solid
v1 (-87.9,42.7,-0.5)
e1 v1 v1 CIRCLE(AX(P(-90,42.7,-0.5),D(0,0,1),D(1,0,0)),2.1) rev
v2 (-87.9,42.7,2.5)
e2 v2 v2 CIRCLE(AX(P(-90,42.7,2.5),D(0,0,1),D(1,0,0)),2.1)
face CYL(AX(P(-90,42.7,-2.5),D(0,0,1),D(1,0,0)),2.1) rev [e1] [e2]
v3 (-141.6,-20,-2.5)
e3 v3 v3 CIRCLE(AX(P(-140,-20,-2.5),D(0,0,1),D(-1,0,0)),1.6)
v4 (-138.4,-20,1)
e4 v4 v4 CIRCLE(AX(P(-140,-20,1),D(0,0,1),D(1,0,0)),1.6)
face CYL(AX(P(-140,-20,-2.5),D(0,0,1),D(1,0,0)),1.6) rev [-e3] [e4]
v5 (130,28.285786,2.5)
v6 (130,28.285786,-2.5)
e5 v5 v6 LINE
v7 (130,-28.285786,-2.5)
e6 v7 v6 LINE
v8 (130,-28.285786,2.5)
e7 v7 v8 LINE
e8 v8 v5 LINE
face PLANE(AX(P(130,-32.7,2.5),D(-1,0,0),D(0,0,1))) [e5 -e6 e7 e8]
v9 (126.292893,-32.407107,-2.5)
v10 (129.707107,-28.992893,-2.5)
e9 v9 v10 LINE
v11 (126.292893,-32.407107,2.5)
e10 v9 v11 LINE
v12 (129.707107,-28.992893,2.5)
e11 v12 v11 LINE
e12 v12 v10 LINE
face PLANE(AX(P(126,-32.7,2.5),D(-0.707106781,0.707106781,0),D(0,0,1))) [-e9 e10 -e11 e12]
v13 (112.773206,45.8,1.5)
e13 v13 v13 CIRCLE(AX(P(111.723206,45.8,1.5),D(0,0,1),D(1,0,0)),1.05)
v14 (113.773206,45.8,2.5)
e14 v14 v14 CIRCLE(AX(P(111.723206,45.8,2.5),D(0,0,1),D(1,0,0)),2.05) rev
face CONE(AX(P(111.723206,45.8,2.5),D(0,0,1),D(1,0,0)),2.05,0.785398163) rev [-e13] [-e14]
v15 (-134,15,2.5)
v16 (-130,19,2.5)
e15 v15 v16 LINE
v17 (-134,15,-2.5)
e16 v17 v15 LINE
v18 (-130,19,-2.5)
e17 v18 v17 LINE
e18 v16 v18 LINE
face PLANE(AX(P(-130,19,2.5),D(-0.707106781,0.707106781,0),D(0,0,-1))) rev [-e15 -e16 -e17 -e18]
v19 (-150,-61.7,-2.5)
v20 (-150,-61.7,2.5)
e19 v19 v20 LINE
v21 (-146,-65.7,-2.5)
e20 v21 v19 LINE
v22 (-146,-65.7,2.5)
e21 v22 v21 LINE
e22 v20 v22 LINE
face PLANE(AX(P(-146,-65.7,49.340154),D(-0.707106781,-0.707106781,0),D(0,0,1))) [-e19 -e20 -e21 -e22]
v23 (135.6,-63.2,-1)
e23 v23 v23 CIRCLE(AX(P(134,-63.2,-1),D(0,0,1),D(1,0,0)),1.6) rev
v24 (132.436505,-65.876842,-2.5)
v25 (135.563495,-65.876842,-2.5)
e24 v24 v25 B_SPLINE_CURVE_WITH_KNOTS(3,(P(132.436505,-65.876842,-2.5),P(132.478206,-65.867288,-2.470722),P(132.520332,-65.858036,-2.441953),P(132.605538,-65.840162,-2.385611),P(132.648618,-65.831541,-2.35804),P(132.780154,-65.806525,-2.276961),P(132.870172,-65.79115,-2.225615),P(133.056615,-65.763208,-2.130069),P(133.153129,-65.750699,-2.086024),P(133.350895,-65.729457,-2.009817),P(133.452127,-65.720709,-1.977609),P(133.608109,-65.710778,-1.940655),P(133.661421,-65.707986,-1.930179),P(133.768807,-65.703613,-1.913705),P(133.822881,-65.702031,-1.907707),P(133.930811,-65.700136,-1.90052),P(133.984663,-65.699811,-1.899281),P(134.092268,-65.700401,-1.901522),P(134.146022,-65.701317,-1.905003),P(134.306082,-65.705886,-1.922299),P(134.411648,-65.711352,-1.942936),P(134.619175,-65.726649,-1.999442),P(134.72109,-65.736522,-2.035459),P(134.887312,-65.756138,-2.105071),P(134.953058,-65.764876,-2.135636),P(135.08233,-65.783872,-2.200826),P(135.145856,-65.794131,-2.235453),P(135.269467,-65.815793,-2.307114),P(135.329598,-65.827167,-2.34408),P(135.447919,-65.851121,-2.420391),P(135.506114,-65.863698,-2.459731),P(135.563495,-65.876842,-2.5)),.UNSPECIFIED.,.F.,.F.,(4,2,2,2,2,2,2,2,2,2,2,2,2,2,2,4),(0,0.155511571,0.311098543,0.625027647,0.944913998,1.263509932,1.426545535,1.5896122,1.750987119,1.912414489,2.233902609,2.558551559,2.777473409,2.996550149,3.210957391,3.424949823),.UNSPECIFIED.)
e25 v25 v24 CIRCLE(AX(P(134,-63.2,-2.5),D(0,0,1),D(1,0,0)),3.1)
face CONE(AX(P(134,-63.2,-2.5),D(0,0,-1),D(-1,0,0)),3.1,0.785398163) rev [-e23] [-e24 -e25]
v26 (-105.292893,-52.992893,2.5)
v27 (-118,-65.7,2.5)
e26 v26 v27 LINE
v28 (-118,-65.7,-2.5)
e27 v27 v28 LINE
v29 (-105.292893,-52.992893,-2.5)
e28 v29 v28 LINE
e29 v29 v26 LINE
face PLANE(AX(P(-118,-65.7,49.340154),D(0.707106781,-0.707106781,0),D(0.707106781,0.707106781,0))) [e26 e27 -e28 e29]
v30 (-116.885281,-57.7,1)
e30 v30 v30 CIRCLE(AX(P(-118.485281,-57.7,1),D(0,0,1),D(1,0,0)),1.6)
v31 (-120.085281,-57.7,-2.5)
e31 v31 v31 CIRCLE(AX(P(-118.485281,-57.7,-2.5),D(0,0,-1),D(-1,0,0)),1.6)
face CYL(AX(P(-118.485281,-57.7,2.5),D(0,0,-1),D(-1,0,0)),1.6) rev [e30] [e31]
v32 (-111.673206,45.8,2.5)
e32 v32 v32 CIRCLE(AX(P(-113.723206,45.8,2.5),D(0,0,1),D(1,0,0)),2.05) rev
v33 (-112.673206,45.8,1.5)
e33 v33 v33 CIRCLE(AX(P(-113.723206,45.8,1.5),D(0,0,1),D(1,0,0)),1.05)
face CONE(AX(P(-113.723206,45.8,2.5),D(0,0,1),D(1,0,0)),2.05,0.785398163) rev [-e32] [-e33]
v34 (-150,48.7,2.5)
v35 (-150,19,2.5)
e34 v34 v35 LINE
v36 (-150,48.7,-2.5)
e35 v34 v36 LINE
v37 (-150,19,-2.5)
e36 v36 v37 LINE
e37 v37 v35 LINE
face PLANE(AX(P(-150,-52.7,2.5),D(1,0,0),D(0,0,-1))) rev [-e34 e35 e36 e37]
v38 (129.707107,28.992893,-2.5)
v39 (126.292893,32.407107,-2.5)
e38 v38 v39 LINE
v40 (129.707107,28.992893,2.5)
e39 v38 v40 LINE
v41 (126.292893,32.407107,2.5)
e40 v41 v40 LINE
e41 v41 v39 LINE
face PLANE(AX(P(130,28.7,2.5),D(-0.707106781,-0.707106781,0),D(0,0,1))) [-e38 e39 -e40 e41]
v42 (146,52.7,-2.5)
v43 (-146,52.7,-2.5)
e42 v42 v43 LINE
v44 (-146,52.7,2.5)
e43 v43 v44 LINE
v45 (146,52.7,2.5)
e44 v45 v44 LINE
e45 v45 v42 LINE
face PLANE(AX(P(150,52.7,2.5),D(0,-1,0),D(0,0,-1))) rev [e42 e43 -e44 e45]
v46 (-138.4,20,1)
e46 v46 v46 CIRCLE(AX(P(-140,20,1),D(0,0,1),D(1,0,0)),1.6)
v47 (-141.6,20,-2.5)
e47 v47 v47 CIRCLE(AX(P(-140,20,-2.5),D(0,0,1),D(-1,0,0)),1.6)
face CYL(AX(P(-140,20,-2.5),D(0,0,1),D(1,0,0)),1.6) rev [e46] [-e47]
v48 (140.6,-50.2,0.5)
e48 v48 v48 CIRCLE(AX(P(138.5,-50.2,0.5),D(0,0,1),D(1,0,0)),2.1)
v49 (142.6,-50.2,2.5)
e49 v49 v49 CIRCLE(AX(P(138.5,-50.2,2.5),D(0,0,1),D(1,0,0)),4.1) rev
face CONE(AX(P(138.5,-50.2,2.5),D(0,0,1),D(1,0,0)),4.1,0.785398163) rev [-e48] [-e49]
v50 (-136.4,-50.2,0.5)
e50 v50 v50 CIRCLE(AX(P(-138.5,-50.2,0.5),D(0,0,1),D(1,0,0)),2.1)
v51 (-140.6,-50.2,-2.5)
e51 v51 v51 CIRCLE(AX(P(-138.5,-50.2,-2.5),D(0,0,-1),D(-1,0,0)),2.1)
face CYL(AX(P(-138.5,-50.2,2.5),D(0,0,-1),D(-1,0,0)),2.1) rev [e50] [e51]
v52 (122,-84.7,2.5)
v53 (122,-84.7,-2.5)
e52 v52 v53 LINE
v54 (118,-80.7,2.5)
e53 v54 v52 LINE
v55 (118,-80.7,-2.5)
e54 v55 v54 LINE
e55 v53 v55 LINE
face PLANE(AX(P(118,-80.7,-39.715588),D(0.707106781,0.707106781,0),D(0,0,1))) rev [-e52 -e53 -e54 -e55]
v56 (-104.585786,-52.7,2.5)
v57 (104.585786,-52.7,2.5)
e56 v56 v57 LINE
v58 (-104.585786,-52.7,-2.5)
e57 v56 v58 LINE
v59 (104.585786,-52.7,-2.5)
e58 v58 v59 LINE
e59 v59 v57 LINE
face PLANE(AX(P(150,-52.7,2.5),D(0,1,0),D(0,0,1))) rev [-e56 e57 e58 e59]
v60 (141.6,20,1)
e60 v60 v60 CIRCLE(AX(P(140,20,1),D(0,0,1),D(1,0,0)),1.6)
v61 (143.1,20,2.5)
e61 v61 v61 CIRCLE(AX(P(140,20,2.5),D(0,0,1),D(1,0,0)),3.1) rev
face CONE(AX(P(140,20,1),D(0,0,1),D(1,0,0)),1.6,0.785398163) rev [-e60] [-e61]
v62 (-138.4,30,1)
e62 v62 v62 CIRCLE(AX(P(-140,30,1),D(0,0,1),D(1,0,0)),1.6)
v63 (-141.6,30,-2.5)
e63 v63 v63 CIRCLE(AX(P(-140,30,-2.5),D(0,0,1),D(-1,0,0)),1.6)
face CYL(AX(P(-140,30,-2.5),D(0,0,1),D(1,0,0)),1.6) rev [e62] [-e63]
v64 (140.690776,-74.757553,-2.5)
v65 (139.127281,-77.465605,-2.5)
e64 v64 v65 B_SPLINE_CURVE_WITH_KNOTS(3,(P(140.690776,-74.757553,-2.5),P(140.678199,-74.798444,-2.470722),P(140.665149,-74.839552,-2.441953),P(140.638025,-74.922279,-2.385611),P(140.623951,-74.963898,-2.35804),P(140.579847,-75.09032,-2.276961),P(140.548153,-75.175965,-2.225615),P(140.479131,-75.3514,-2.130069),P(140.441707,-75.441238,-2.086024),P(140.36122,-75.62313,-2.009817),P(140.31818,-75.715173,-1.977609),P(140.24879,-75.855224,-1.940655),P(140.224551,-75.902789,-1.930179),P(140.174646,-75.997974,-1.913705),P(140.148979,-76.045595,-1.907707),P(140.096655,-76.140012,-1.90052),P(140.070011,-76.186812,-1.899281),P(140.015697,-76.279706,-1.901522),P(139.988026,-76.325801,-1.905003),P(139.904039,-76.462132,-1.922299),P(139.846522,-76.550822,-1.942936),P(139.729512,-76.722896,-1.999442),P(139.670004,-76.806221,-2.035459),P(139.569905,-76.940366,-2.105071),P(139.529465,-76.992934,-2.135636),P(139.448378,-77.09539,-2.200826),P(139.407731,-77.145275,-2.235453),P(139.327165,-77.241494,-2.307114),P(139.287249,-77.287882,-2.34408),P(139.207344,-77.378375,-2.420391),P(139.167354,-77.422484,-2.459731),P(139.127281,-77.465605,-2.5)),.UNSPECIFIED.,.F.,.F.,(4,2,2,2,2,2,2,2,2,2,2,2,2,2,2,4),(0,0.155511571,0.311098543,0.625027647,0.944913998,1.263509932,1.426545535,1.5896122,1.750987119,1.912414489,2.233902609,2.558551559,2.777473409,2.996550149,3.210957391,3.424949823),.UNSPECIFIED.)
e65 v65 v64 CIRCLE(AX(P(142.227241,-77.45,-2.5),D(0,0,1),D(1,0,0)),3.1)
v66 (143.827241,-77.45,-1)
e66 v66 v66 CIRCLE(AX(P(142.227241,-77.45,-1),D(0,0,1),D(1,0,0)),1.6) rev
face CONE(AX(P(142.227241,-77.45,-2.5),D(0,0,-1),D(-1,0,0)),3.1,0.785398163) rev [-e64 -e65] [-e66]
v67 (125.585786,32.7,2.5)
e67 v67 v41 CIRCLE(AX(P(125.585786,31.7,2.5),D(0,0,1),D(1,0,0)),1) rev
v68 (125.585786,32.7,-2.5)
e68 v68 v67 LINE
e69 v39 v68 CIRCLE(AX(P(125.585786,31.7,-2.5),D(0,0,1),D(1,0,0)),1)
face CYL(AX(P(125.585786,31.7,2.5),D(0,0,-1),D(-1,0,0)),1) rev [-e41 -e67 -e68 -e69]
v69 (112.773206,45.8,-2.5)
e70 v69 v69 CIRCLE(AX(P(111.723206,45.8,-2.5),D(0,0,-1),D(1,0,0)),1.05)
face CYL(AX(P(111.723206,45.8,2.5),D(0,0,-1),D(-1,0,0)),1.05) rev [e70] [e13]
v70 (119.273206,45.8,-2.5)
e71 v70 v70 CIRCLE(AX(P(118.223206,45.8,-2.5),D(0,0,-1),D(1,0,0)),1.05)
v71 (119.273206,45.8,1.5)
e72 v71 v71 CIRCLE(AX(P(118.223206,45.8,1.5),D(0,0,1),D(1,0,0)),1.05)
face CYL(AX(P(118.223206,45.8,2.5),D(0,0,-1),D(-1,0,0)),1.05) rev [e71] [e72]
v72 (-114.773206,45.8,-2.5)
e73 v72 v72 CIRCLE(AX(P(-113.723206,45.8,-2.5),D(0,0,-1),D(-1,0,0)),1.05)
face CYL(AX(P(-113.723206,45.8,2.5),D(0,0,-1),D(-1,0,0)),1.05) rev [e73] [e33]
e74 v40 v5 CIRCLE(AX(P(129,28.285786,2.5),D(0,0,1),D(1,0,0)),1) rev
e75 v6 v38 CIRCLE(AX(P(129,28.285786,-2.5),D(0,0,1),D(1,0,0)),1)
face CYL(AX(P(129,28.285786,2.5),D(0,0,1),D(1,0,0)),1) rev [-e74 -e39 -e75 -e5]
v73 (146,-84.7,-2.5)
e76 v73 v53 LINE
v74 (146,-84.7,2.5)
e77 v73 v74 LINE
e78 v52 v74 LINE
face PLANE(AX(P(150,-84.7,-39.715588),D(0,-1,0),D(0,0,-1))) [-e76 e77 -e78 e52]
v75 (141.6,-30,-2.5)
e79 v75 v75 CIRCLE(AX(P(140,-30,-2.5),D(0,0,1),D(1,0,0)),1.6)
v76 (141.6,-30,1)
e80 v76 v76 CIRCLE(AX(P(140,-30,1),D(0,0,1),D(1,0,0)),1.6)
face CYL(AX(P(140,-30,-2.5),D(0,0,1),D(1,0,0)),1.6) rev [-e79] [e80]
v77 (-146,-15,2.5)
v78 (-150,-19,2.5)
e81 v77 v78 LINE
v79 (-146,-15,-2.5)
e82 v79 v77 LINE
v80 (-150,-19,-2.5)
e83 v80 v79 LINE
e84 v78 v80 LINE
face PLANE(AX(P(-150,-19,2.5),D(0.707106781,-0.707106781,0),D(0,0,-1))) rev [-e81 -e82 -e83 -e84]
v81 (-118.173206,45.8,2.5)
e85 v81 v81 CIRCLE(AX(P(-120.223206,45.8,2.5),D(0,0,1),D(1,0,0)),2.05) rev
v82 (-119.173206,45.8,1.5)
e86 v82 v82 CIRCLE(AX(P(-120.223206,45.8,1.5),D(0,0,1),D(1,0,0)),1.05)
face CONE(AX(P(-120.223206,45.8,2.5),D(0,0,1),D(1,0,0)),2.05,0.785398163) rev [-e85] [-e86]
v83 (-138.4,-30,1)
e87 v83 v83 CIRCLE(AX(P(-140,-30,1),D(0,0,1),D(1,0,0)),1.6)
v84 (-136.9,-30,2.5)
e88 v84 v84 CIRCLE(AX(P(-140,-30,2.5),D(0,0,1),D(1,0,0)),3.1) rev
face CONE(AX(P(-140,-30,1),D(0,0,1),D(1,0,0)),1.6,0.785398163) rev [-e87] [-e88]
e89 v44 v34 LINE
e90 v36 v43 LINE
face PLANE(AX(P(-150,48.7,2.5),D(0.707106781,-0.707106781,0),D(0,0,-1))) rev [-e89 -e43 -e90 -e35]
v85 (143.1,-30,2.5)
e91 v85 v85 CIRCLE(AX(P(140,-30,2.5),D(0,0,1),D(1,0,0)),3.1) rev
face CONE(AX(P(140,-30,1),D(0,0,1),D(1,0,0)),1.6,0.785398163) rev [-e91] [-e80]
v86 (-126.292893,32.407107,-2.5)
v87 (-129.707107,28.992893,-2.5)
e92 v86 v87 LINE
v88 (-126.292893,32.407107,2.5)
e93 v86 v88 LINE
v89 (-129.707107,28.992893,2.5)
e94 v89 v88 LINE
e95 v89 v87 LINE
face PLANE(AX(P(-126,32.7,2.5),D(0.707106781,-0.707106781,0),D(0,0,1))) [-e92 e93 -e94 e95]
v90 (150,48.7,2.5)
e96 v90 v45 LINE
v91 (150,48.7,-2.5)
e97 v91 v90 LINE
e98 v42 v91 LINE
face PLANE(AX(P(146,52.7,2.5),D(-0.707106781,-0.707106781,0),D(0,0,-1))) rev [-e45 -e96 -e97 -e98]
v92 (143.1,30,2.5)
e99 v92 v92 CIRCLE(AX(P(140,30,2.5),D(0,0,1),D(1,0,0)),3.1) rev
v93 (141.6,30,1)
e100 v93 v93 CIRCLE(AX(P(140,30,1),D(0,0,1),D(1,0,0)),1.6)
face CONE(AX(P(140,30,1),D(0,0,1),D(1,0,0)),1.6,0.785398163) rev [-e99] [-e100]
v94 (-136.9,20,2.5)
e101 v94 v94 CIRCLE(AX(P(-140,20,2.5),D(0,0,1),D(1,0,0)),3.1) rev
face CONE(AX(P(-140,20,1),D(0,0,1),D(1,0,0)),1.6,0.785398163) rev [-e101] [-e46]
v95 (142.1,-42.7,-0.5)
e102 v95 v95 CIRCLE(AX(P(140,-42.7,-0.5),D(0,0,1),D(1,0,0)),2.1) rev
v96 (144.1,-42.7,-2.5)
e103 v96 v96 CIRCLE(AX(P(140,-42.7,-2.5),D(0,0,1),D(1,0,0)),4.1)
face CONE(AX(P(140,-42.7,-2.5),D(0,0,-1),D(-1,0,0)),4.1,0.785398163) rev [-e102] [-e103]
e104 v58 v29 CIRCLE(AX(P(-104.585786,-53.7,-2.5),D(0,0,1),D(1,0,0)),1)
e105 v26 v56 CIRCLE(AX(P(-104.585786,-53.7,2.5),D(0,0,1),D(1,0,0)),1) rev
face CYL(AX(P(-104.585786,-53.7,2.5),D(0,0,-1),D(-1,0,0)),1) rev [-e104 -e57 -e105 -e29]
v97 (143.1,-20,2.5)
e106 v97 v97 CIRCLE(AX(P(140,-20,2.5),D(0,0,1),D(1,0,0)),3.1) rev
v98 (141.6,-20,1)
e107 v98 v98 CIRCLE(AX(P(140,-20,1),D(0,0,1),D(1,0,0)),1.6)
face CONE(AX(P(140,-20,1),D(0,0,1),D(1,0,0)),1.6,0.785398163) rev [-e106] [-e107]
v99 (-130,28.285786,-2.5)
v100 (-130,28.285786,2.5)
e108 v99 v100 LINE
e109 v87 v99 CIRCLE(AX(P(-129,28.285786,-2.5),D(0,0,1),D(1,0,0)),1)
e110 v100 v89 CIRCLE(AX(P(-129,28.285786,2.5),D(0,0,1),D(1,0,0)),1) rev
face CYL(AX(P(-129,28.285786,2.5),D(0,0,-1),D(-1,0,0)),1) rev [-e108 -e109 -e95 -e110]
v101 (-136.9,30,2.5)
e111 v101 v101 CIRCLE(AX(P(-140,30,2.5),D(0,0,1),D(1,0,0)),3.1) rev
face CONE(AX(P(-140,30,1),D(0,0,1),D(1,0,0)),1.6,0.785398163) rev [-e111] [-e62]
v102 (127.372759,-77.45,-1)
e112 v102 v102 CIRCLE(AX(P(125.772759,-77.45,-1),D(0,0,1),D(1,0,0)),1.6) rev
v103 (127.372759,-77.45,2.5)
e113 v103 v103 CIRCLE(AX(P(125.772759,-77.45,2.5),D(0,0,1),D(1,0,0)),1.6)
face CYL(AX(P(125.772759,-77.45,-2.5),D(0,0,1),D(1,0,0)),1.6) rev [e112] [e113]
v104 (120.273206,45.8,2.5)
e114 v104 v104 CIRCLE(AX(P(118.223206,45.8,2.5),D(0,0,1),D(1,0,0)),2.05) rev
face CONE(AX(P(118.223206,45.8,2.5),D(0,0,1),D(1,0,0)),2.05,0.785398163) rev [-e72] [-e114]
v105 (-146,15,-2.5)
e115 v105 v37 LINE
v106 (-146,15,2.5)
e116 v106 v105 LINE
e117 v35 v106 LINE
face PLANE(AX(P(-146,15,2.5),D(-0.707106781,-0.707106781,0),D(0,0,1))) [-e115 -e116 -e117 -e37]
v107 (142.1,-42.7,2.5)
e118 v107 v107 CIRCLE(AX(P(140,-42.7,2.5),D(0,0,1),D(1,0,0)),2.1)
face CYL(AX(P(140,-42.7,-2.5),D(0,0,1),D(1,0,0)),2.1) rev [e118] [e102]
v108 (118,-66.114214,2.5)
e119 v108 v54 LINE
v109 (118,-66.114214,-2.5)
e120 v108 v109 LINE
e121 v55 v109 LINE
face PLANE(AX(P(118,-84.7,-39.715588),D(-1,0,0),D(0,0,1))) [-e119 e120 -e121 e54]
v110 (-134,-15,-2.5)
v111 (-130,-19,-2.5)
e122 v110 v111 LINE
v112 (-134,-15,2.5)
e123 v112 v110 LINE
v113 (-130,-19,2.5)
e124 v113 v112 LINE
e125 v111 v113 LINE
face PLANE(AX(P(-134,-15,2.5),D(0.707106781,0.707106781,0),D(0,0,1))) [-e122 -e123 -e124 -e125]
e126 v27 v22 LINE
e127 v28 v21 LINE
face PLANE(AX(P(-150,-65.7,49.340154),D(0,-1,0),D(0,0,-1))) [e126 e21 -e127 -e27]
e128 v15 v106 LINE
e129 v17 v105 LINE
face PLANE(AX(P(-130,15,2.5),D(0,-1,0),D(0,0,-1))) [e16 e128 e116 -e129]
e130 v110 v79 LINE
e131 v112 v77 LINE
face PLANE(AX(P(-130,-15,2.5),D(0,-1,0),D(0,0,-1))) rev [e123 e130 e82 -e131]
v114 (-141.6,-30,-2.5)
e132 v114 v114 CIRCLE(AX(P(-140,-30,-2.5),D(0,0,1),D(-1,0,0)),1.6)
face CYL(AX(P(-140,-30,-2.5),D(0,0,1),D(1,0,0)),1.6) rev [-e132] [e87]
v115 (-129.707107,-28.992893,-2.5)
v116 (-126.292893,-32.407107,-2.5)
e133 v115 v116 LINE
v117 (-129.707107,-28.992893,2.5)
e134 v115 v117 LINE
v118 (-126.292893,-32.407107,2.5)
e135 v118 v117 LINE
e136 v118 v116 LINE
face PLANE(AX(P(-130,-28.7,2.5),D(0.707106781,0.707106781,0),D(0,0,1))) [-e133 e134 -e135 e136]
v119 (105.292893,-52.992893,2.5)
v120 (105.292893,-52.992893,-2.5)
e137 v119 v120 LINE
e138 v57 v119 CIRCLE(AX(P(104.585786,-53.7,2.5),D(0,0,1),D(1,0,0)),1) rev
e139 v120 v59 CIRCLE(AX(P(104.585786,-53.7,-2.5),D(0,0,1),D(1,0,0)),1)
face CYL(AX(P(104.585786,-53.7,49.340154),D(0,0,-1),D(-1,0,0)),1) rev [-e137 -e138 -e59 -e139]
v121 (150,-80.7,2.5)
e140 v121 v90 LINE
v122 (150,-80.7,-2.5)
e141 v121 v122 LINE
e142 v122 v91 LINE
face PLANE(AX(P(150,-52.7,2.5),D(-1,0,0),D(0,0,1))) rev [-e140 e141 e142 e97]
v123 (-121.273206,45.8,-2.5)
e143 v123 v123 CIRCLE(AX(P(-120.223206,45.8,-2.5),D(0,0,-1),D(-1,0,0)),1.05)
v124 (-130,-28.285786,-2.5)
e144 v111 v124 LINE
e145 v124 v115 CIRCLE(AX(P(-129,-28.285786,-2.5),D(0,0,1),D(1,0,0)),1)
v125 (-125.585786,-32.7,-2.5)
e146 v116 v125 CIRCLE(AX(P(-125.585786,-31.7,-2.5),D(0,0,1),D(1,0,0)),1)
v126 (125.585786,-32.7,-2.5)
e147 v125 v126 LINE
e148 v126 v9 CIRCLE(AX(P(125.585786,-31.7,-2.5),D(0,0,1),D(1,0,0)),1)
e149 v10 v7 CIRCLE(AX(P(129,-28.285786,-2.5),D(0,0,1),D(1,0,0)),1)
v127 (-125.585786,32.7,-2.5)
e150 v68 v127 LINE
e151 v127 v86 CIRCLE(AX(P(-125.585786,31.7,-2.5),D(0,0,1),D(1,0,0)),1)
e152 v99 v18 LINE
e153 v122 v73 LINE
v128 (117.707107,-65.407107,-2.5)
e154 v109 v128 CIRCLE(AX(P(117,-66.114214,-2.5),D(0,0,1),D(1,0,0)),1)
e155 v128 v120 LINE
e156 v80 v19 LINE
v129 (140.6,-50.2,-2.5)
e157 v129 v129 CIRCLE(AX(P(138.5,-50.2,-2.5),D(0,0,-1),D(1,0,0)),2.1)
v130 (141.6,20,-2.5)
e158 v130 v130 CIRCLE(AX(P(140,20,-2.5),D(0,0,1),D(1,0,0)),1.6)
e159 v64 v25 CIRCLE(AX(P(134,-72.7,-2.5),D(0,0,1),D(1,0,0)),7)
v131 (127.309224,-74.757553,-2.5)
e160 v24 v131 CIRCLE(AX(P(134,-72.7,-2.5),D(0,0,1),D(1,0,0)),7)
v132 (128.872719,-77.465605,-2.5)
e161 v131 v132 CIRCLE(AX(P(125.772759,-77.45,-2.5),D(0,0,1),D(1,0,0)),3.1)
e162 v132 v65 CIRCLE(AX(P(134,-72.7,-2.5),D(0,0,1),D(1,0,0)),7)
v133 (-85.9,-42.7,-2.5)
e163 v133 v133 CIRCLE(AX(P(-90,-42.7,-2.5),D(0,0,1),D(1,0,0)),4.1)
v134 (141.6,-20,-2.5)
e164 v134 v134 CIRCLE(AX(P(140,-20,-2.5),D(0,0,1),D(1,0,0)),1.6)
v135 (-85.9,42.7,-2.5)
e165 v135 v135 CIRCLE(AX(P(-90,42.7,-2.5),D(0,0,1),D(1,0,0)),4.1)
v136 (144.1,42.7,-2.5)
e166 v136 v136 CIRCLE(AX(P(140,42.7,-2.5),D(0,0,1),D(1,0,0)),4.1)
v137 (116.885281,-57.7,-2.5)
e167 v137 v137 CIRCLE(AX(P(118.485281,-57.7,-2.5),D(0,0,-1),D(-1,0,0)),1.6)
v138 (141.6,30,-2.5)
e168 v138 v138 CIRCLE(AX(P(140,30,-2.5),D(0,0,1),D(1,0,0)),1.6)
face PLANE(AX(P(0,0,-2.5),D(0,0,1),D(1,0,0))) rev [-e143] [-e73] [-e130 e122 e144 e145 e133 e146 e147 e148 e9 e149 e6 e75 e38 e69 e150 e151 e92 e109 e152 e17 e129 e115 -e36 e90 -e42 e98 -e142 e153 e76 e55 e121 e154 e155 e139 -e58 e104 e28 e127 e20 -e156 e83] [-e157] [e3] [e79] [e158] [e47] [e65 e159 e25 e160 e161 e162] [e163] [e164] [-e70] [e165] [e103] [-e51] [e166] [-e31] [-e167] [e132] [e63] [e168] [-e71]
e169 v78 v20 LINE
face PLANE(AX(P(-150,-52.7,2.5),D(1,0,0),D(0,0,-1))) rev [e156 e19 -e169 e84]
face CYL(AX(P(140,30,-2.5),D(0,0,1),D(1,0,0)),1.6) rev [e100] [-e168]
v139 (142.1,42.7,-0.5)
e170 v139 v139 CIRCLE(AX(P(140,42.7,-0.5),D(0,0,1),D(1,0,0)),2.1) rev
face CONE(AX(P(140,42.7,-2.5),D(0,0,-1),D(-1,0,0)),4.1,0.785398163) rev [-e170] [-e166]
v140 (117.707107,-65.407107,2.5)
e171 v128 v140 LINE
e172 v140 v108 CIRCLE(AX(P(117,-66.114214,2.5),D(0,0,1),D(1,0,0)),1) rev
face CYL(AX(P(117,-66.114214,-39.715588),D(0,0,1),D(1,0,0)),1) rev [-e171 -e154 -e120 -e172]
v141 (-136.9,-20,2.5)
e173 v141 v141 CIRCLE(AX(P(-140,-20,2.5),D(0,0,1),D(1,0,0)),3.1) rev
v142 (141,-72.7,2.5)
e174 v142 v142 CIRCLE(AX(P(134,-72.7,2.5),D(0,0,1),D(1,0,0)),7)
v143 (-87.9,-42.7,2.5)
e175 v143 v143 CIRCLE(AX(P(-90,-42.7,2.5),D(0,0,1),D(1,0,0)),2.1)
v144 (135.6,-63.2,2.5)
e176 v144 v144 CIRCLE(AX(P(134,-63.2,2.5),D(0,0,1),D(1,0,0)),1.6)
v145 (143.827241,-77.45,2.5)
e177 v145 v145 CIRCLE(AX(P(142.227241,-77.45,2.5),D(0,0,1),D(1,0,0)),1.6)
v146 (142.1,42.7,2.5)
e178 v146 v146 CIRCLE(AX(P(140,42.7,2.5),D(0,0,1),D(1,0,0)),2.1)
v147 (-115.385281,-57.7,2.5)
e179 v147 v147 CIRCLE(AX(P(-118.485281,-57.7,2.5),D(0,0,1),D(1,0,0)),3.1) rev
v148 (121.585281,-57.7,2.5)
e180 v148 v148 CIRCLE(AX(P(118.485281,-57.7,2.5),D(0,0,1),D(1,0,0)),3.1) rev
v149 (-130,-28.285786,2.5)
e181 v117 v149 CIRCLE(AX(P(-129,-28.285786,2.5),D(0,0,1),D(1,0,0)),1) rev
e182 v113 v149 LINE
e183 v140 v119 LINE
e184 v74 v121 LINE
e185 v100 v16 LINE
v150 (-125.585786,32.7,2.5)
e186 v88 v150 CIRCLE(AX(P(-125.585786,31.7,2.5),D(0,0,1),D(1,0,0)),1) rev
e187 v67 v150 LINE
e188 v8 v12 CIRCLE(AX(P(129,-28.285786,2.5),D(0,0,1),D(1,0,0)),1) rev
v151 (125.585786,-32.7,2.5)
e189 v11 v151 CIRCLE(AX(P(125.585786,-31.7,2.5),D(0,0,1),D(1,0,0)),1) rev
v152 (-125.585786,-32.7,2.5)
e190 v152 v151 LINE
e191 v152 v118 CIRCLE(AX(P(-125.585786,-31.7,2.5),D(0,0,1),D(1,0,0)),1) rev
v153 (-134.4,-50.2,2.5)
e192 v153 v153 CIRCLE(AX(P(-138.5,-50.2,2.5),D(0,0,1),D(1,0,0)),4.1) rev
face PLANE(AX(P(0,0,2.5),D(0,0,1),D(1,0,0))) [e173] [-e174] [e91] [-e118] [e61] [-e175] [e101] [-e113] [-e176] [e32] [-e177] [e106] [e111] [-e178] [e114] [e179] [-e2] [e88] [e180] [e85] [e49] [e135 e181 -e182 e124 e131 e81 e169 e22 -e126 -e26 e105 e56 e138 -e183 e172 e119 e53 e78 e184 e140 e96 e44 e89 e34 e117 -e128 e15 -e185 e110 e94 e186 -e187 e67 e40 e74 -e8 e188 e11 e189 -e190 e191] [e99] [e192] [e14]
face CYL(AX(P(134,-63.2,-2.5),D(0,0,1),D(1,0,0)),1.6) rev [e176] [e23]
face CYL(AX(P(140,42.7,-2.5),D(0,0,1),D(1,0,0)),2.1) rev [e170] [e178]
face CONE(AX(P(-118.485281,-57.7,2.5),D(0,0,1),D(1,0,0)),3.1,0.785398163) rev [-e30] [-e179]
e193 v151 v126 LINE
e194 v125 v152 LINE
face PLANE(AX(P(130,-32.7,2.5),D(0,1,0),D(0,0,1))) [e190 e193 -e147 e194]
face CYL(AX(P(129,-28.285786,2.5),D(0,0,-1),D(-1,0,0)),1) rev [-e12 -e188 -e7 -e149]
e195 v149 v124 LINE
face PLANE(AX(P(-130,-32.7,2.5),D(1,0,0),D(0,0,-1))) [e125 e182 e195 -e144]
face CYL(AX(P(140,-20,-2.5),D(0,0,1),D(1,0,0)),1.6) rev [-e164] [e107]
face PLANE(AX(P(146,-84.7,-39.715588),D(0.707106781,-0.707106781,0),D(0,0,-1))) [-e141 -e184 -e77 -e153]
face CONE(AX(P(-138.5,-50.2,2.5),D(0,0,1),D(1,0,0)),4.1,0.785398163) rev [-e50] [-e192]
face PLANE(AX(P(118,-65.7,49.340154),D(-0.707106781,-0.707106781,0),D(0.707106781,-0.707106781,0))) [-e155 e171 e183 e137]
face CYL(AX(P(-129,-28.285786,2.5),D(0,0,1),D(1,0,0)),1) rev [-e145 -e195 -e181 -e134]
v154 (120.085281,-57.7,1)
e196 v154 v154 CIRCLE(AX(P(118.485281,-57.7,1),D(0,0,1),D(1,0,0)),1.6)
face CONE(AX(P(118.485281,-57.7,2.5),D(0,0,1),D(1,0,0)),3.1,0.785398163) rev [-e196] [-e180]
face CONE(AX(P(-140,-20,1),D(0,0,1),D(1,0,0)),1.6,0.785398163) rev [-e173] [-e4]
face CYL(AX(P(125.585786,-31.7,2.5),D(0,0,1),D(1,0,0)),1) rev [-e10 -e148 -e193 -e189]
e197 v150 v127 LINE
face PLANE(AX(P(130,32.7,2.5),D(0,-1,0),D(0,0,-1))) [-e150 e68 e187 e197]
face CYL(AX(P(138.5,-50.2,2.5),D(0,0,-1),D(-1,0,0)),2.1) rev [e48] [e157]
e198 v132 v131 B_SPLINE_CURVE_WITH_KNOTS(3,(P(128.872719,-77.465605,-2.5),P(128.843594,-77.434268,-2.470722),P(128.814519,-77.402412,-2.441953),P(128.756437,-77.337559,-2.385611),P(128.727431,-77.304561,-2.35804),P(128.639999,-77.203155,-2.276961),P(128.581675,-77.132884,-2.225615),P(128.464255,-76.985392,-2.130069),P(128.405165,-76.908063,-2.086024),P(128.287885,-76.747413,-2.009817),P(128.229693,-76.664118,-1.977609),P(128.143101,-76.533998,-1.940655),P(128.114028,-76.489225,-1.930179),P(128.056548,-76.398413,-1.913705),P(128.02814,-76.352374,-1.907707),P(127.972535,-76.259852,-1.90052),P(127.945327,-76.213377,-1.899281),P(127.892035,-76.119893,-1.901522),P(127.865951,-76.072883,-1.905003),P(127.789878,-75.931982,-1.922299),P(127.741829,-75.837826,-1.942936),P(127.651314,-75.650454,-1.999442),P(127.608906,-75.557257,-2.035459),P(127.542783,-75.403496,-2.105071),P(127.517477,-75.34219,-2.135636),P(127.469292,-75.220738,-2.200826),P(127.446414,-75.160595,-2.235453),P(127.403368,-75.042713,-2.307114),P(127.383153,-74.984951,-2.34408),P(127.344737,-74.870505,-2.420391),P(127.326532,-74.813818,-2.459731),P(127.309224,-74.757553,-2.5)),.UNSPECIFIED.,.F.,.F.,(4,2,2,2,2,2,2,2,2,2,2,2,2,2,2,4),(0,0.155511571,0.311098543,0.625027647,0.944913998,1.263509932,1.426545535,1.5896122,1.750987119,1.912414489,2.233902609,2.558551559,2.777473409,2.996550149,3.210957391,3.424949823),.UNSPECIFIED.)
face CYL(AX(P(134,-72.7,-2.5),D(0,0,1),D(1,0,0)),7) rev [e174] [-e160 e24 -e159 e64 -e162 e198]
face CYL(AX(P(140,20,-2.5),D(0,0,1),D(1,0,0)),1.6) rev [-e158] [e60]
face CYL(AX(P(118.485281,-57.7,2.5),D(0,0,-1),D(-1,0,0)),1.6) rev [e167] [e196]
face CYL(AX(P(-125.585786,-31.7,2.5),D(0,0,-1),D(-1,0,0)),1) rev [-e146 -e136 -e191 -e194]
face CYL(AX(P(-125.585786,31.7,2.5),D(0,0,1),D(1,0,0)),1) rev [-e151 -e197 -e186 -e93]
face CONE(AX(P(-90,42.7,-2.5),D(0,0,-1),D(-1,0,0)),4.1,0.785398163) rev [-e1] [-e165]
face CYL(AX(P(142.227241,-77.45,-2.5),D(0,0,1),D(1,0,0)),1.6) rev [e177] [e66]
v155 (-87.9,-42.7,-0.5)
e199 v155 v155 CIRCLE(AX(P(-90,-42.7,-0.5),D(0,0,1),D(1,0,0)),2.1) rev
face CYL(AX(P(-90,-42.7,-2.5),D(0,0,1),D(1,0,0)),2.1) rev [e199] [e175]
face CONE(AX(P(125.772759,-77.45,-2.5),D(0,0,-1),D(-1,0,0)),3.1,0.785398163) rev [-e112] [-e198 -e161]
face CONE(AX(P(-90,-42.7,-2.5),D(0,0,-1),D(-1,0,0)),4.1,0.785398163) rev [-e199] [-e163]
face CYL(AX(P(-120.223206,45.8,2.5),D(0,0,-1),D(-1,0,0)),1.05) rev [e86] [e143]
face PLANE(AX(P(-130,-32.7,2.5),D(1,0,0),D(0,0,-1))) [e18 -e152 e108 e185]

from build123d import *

# Parameters (mm, degrees)
SKETCH_1_W          = 300
SKETCH_1_H          = 105.4
SKETCH_1_W_2        = 260
SKETCH_1_H_2        = 65.4
EXTRUDE_1_DEPTH     = 2.5
SKETCH_2_R          = 2.1
CUT_EXTRUDE_1_DEPTH = 160.066935596
SKETCH_3_R          = 1.6
CUT_EXTRUDE_2_DEPTH = 160.066935596
CHAMFER_1_SIZE      = 1.5
CHAMFER_2_SIZE      = 2
SKETCH_5_W          = 20
SKETCH_5_H          = 30
CUT_EXTRUDE_5_DEPTH = 160.066935596
EXTRUDE_2_DEPTH     = 5
SKETCH_7_R          = 1.6
SKETCH_7_R_2        = 2.1
CUT_EXTRUDE_6_DEPTH = 164.833726687
CHAMFER_4_SIZE      = 2
CHAMFER_5_SIZE      = 1.5
SKETCH_8_W          = 32
SKETCH_8_H          = 19
EXTRUDE_3_DEPTH     = 5
CHAMFER_3_SIZE      = 4
FILLET_1_R          = 1
SKETCH_9_R          = 7
SKETCH_9_R_2        = 1.6
CUT_EXTRUDE_7_DEPTH = 173.334239198
CHAMFER_6_SIZE      = 1.5
SKETCH_10_R         = 1.05
CUT_EXTRUDE_8_DEPTH = 173.334239201
CHAMFER_7_SIZE      = 1


with BuildPart() as part:
    # 草图1 → 凸台-拉伸1 (new, symmetric)
    with BuildSketch(Plane.XY):
        Rectangle(SKETCH_1_W, SKETCH_1_H)
        Rectangle(SKETCH_1_W_2, SKETCH_1_H_2, mode=Mode.SUBTRACT)
    extrude(amount=EXTRUDE_1_DEPTH, both=True)

    # 草图2 → 切除-拉伸1 (cut, through all)
    with BuildSketch(Plane.XY.offset(2.5)):
        with Locations((-90, 42.7)):
            Circle(SKETCH_2_R)
        with Locations((140, 42.7)):
            Circle(SKETCH_2_R)
        with Locations((-90, -42.7)):
            Circle(SKETCH_2_R)
        with Locations((140, -42.7)):
            Circle(SKETCH_2_R)
    extrude(amount=-CUT_EXTRUDE_1_DEPTH, mode=Mode.SUBTRACT)

    # 草图3 → 切除-拉伸2 (cut, through all)
    with BuildSketch(Plane.XY.offset(2.5)):
        with Locations((140, 30)):
            Circle(SKETCH_3_R)
        with Locations((140, -30)):
            Circle(SKETCH_3_R)
        with Locations((140, 20)):
            Circle(SKETCH_3_R)
        with Locations((140, -20)):
            Circle(SKETCH_3_R)
        with Locations(Location((-140, -30, 0), (0, 0, 180))):
            Circle(SKETCH_3_R)
        with Locations(Location((-140, -20, 0), (0, 0, 180))):
            Circle(SKETCH_3_R)
        with Locations(Location((-140, 20, 0), (0, 0, 180))):
            Circle(SKETCH_3_R)
        with Locations(Location((-140, 30, 0), (0, 0, 180))):
            Circle(SKETCH_3_R)
    extrude(amount=-CUT_EXTRUDE_2_DEPTH, mode=Mode.SUBTRACT)

    # 倒角1
    chamfer_1_edges = [part.edges().sort_by_distance(p)[0] for p in [
        (-138.4, -30, 2.5),
        (138.4, -20, 2.5),
        (138.4, 20, 2.5),
        (138.4, -30, 2.5),
        (-138.4, -20, 2.5),
        (-138.4, 20, 2.5),
        (-138.4, 30, 2.5),
        (138.4, 30, 2.5),
    ]]
    chamfer(chamfer_1_edges, length=CHAMFER_1_SIZE)

    # 倒角2
    chamfer_2_edges = [part.edges().sort_by_distance(p)[0] for p in [
        (137.9, 42.7, -2.5),
        (-92.1, -42.7, -2.5),
        (137.9, -42.7, -2.5),
        (-92.1, 42.7, -2.5),
    ]]
    chamfer(chamfer_2_edges, length=CHAMFER_2_SIZE)

    # 草图5 → 切除-拉伸5 (cut, through all)
    with BuildSketch(Plane(origin=(0, 0, -2.5), x_dir=(-1, 0, 0), z_dir=(0, 0, -1))):
        with Locations((140, 0)):
            Rectangle(SKETCH_5_W, SKETCH_5_H)
    extrude(amount=-CUT_EXTRUDE_5_DEPTH, mode=Mode.SUBTRACT)

    # 草图6 → 凸台-拉伸2 (add)
    with BuildSketch(Plane(origin=(0, 0, -2.5), x_dir=(-1, 0, 0), z_dir=(0, 0, -1))):
        Polygon((150, -52.7), (150, -65.7), (118, -65.7), (105, -52.7), align=None)
        Polygon((-118, -65.7), (-105, -52.7), (-150, -52.7), (-150, -65.7), align=None)
    extrude(amount=-EXTRUDE_2_DEPTH)

    # 草图7 → 切除-拉伸6 (cut, through all)
    with BuildSketch(Plane(origin=(0, 0, -2.5), x_dir=(-1, 0, 0), z_dir=(0, 0, -1))):
        with Locations((118.485281374, -57.7)):
            Circle(SKETCH_7_R)
        with Locations((-118.485281374, -57.7)):
            Circle(SKETCH_7_R)
        with Locations((138.5, -50.2)):
            Circle(SKETCH_7_R_2)
        with Locations(Location((-138.5, -50.2, 0), (0, 0, 180))):
            Circle(SKETCH_7_R_2)
    extrude(amount=-CUT_EXTRUDE_6_DEPTH, mode=Mode.SUBTRACT)

    # 倒角4
    chamfer_4_edges = [part.edges().sort_by_distance(p)[0] for p in [
        (136.4, -50.2, 2.5),
        (-136.4, -50.2, 2.5),
    ]]
    chamfer(chamfer_4_edges, length=CHAMFER_4_SIZE)

    # 倒角5
    chamfer_5_edges = [part.edges().sort_by_distance(p)[0] for p in [
        (120.085281374, -57.7, 2.5),
        (-116.885281374, -57.7, 2.5),
    ]]
    chamfer(chamfer_5_edges, length=CHAMFER_5_SIZE)

    # 草图8 → 凸台-拉伸3 (add)
    with BuildSketch(Plane.XY.offset(2.5)):
        with Locations((134, -75.2)):
            Rectangle(SKETCH_8_W, SKETCH_8_H)
    extrude(amount=-EXTRUDE_3_DEPTH)

    # 倒角3
    chamfer_3_edges = [part.edges().sort_by_distance(p)[0] for p in [
        (-130, -15, 0),
        (-130, 15, 0),
        (-150, 15, 0),
        (-150, -15, 0),
        (-150, -65.7, 0),
        (-130, 32.7, 0),
        (-130, -32.7, 0),
        (130, -32.7, 0),
        (130, 32.7, 0),
        (150, -84.7, 0),
        (118, -84.7, 0),
        (-150, 52.7, 0),
        (150, 52.7, 0),
    ]]
    chamfer(chamfer_3_edges, length=CHAMFER_3_SIZE)

    # 圆角1
    fillet_1_edges = [part.edges().sort_by_distance(p)[0] for p in [
        (-105, -52.7, 0),
        (105, -52.7, 0),
        (118, -65.7, 0),
        (-130, 28.7, 0),
        (-130, -28.7, 0),
        (126, -32.7, 0),
        (-126, -32.7, 0),
        (126, 32.7, 0),
        (-126, 32.7, 0),
        (130, -28.7, 0),
        (130, 28.7, 0),
    ]]
    fillet(fillet_1_edges, radius=FILLET_1_R)

    # 草图9 → 切除-拉伸7 (cut, through all)
    with BuildSketch(Plane.XY.offset(2.5)):
        with Locations((134, -72.7)):
            Circle(SKETCH_9_R)
        with Locations((134, -63.2)):
            Circle(SKETCH_9_R_2)
        with Locations((142.227241336, -77.45)):
            Circle(SKETCH_9_R_2)
        with Locations((125.772758664, -77.45)):
            Circle(SKETCH_9_R_2)
    extrude(amount=-CUT_EXTRUDE_7_DEPTH, mode=Mode.SUBTRACT)

    # 倒角6
    # the kernel refuses this chamfer: 1.5 mm, written as the material it takes off along each edge
    with BuildSketch(Plane(origin=(125.772758664, -77.45, -2.5), x_dir=(1, 0, 0), z_dir=(0, -1, 0))) as chamfer_6_piece_1:
        Polygon((1.6, CHAMFER_6_SIZE), (1.6 + CHAMFER_6_SIZE, 0), (1.6, 0), align=None)
    revolve(axis=Axis((125.772758664, -77.45, -2.5), (0, 0, 1)), mode=Mode.SUBTRACT)
    with BuildSketch(Plane(origin=(142.227241336, -77.45, -2.5), x_dir=(1, 0, 0), z_dir=(0, -1, 0))) as chamfer_6_piece_2:
        Polygon((1.6, CHAMFER_6_SIZE), (1.6 + CHAMFER_6_SIZE, 0), (1.6, 0), align=None)
    revolve(axis=Axis((142.227241336, -77.45, -2.5), (0, 0, 1)), mode=Mode.SUBTRACT)
    with BuildSketch(Plane(origin=(134, -63.2, -2.5), x_dir=(1, 0, 0), z_dir=(0, -1, 0))) as chamfer_6_piece_3:
        Polygon((1.6, CHAMFER_6_SIZE), (1.6 + CHAMFER_6_SIZE, 0), (1.6, 0), align=None)
    revolve(axis=Axis((134, -63.2, -2.5), (0, 0, 1)), mode=Mode.SUBTRACT)

    # 草图10 → 切除-拉伸8 (cut, through all)
    with BuildSketch(Plane(origin=(0, 0, -2.5), x_dir=(-1, 0, 0), z_dir=(0, 0, -1))):
        with Locations((120.223206297, 45.8)):
            Circle(SKETCH_10_R)
        with Locations((113.723206297, 45.8)):
            Circle(SKETCH_10_R)
        with Locations(Location((-111.723206297, 45.8, 0), (0, 0, 180))):
            Circle(SKETCH_10_R)
        with Locations(Location((-118.223206297, 45.8, 0), (0, 0, 180))):
            Circle(SKETCH_10_R)
    extrude(amount=-CUT_EXTRUDE_8_DEPTH, mode=Mode.SUBTRACT)

    # 倒角7
    chamfer_7_edges = [part.edges().sort_by_distance(p)[0] for p in [
        (-119.173206297, 45.8, 2.5),
        (-112.673206297, 45.8, 2.5),
        (110.673206297, 45.8, 2.5),
        (117.173206297, 45.8, 2.5),
    ]]
    chamfer(chamfer_7_edges, length=CHAMFER_7_SIZE)


solid = part.part
